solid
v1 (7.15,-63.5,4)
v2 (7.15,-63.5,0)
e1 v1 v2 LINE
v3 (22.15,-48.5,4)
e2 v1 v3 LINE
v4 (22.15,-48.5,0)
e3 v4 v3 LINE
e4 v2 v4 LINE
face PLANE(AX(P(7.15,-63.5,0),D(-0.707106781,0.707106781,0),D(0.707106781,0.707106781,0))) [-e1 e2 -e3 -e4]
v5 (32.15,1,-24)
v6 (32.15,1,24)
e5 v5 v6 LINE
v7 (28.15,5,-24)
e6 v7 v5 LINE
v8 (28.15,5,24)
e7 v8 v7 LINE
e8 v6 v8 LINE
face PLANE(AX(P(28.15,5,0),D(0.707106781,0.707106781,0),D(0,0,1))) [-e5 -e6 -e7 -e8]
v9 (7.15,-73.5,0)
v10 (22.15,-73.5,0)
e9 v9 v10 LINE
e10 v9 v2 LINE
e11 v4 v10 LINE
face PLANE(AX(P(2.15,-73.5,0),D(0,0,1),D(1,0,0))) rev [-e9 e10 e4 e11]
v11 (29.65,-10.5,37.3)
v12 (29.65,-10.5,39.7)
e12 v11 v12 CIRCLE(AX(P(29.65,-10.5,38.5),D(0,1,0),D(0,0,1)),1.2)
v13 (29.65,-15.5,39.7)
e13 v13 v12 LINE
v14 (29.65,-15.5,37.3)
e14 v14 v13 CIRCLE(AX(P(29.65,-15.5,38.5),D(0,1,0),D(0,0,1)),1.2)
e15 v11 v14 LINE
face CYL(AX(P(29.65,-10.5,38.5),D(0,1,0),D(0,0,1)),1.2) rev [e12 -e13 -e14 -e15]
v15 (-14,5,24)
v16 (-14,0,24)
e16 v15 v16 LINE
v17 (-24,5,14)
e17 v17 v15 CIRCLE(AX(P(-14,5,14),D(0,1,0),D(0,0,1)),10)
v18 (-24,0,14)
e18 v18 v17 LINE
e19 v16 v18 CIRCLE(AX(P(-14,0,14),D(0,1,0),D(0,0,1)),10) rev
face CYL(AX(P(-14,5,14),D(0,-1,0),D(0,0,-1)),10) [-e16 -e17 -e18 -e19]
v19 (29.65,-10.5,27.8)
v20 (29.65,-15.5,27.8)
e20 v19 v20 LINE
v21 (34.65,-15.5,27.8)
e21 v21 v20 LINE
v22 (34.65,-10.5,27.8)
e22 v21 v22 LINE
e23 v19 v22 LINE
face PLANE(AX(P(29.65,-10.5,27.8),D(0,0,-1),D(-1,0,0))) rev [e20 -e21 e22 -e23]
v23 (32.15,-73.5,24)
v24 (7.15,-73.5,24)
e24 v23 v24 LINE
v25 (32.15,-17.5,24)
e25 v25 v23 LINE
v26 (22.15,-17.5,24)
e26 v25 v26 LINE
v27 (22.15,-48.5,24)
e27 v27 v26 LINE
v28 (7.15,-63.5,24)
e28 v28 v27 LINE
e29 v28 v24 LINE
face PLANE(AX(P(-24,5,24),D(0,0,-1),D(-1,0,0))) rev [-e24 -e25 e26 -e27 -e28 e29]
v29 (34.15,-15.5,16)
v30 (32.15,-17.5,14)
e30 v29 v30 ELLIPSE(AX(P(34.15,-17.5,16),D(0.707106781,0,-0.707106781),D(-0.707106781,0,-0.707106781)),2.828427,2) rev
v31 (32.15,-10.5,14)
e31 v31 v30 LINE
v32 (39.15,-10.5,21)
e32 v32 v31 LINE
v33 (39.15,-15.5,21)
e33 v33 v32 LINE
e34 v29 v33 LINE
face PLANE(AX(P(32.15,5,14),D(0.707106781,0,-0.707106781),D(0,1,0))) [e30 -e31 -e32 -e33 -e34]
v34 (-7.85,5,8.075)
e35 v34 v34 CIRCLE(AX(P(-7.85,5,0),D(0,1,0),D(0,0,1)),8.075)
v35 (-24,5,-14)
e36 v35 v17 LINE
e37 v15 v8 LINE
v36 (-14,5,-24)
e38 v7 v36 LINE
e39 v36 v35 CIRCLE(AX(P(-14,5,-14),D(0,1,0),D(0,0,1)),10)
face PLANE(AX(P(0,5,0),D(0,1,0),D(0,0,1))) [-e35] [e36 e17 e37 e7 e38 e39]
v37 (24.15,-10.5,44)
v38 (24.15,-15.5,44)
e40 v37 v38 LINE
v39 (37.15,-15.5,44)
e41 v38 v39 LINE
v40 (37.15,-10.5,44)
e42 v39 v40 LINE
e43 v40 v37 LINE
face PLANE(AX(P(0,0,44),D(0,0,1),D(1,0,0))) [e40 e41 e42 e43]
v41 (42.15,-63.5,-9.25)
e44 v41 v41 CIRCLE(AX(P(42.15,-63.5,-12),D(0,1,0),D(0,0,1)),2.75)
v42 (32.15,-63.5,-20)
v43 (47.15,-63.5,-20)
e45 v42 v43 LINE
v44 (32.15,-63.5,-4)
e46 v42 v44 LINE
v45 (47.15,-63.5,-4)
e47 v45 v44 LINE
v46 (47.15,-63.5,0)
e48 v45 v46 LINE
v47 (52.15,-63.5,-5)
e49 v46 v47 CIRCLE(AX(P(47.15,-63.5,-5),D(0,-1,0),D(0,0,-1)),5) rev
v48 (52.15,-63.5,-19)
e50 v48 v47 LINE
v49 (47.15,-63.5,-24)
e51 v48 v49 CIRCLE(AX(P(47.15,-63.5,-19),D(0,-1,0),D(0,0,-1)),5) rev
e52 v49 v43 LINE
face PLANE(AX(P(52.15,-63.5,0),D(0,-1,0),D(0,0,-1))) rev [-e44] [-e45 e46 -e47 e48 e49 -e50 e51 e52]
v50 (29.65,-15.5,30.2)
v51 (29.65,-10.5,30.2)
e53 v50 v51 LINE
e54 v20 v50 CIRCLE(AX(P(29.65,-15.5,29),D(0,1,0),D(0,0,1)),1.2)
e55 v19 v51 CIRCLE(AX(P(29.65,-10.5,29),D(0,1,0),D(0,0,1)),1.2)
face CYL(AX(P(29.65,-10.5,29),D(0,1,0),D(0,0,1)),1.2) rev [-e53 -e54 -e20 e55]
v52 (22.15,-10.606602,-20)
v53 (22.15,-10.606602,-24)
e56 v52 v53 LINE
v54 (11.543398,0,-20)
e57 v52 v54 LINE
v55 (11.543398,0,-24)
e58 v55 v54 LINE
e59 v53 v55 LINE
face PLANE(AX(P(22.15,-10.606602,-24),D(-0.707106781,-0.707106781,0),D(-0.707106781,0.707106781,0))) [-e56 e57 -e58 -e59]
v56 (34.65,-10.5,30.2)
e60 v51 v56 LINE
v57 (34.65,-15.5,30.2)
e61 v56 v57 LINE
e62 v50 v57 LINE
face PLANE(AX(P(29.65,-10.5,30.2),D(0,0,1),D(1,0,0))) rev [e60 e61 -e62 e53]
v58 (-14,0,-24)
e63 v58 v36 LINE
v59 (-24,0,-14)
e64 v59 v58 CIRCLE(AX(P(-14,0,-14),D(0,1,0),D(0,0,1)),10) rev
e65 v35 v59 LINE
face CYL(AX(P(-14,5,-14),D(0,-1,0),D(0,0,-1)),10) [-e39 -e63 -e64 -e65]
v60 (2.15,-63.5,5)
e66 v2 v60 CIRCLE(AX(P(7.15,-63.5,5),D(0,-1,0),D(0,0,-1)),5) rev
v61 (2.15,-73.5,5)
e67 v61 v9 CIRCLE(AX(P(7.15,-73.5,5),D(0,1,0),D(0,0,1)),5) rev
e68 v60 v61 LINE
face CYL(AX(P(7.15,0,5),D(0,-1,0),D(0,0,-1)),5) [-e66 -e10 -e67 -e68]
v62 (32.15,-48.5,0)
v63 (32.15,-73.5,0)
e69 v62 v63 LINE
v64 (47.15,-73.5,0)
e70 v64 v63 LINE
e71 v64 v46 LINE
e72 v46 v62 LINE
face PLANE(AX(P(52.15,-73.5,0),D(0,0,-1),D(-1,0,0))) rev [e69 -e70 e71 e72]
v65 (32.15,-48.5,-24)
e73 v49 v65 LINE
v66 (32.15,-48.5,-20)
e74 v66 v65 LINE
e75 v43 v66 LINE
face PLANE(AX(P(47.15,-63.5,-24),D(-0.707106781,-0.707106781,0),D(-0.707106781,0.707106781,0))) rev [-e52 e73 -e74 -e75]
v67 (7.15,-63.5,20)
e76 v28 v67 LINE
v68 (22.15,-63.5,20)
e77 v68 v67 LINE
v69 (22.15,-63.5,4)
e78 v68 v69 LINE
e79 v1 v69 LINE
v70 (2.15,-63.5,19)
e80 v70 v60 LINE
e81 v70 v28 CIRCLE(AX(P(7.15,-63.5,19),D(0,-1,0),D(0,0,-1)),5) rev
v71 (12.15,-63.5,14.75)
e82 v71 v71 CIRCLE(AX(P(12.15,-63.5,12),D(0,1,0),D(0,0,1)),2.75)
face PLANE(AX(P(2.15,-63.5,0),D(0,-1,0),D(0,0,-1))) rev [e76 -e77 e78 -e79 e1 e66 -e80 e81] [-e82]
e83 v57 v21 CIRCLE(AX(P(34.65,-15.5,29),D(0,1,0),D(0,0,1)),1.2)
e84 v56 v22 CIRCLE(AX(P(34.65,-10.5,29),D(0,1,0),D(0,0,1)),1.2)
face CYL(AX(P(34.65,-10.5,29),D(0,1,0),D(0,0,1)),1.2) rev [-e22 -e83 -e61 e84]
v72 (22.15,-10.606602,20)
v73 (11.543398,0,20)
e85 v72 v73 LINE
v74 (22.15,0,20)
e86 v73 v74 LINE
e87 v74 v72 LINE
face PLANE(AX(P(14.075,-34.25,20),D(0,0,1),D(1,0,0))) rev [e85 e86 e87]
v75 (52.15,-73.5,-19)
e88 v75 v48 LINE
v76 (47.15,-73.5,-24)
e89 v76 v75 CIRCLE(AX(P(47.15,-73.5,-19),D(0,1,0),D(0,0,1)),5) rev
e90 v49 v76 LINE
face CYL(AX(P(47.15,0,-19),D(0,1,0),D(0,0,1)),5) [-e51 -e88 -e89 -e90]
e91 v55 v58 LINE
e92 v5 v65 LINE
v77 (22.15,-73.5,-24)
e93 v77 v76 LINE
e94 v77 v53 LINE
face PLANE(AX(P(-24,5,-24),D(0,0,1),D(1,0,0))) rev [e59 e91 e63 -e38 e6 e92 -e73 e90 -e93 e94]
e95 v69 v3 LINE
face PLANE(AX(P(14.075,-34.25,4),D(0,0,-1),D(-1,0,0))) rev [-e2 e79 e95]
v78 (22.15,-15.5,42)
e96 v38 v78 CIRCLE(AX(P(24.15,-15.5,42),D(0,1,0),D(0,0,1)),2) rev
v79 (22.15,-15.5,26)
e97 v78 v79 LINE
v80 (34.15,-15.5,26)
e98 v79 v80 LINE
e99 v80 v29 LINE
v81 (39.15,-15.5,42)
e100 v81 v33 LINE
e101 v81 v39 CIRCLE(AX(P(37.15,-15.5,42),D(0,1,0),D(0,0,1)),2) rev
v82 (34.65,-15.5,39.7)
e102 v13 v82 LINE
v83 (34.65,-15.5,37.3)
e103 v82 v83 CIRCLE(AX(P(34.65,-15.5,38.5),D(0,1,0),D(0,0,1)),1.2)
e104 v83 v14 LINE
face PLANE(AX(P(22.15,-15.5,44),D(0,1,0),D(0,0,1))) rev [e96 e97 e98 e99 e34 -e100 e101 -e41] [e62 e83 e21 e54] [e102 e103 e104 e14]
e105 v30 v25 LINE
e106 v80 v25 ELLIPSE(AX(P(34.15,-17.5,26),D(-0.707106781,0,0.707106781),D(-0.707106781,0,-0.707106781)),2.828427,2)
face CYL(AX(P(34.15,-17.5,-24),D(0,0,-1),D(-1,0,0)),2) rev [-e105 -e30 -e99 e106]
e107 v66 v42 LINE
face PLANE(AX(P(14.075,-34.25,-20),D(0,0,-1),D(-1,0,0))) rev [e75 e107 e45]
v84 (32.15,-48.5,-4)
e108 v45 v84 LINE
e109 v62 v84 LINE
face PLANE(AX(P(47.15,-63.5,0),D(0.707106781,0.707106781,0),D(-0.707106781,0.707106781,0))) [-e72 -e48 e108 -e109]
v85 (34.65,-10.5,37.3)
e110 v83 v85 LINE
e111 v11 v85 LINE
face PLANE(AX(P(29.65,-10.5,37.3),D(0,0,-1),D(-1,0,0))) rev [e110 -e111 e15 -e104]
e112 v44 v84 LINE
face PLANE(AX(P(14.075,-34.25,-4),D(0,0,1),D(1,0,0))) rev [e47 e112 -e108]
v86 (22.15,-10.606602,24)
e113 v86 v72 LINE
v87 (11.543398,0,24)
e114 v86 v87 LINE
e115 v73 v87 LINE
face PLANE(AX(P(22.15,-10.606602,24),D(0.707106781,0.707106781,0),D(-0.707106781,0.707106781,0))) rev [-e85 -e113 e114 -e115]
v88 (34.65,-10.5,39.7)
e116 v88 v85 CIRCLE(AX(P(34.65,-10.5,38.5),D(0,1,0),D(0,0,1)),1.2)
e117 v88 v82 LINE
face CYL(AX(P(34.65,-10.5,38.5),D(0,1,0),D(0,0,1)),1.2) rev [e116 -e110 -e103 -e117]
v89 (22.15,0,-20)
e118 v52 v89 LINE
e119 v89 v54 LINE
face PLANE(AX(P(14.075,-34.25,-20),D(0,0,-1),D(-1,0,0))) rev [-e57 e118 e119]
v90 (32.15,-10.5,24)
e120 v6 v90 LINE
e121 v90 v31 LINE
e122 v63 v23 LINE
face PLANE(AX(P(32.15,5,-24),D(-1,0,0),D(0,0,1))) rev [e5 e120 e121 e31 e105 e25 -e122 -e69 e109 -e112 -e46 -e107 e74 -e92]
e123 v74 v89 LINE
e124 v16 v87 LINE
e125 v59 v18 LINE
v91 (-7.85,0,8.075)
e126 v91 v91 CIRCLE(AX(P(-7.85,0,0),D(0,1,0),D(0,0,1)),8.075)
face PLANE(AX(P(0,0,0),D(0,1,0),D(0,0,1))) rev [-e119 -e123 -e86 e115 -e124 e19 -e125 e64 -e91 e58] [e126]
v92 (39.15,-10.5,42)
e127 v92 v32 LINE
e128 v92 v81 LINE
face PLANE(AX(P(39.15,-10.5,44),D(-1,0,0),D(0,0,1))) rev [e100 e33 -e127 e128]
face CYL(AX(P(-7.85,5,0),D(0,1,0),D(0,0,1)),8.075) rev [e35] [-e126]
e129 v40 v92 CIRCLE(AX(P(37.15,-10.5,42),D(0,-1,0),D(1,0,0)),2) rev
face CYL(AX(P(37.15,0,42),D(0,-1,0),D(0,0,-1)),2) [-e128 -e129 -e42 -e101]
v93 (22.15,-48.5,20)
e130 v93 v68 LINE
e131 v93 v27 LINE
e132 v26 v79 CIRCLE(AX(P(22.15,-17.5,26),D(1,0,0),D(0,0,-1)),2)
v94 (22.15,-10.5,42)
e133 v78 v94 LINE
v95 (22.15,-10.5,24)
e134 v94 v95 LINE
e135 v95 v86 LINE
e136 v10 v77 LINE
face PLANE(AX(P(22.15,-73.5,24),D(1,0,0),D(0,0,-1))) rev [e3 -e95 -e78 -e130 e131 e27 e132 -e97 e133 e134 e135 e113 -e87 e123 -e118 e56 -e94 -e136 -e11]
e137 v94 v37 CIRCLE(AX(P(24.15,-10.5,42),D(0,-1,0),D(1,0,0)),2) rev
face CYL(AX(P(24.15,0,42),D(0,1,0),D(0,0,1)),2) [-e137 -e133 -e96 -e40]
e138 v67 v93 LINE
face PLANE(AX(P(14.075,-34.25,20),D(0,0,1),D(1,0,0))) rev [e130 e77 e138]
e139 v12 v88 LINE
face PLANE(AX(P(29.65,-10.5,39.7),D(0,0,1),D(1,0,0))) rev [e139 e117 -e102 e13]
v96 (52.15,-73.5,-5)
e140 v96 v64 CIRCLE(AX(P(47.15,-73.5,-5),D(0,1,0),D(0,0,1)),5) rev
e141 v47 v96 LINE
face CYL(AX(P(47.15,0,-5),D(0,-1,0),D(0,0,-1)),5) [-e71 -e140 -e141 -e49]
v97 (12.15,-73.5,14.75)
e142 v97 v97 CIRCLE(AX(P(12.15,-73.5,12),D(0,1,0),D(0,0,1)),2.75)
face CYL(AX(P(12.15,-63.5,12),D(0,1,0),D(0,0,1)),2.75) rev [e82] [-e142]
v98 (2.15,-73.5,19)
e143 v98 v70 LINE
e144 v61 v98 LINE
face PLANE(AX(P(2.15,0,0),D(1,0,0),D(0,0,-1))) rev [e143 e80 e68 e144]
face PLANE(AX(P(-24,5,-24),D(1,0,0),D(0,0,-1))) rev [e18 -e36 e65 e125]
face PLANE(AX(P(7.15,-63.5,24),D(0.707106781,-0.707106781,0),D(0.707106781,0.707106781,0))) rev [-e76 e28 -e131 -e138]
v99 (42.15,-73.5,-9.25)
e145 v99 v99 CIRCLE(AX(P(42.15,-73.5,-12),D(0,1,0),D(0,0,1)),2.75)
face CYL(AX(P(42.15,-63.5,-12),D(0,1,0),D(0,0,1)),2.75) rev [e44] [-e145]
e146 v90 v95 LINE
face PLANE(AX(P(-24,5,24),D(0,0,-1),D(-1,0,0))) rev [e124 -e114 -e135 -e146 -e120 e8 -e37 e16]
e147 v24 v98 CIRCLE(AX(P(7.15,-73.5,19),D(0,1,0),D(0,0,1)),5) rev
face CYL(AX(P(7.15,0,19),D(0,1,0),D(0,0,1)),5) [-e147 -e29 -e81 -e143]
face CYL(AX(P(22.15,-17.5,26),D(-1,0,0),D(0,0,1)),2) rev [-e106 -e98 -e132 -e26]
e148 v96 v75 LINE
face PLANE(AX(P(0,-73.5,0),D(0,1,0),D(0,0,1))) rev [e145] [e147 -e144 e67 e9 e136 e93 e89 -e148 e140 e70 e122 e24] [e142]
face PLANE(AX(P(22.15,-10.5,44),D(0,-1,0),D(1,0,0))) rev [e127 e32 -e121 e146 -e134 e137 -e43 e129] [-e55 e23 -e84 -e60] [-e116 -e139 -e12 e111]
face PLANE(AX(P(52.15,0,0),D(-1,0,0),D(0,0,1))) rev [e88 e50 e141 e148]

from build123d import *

# Parameters (mm, degrees)
SKETCH1_W                 = 56.15
SKETCH1_H                 = 48
BOSS_EXTRUDE1_DEPTH       = 5
SKETCH2_W                 = 10
SKETCH2_H                 = 48
BOSS_EXTRUDE2_DEPTH       = 73.5
SKETCH3_W                 = 24
SKETCH3_H                 = 10
BOSS_EXTRUDE3_DEPTH       = 20
SKETCH19_W                = 24
SKETCH19_H                = 10
BOSS_EXTRUDE5_DEPTH       = 20
FILLET1_R                 = 10
F_1_0MM_DOWEL_HOLE1_D     = 5.5
F_1_0MM_DOWEL_HOLE1_DEPTH = 10
FILLET2_R                 = 5
M6_CLEARANCE_HOLE1_D      = 16.15
CHAMFER2_SIZE             = 4
SKETCH14_W                = 17
SKETCH14_H                = 5
BOSS_EXTRUDE4_DEPTH       = 20
CHAMFER3_SIZE             = 10
FILLET3_R                 = 2
M2_START                  = -15.5
M2_CLEARANCE_SLOT1_DEPTH  = 5
RIB1_REACH                = 114.898
SKETCH20_WALL_W           = 249.008442536
SKETCH20_WALL_H           = 4
RIB2_REACH                = 104.107
SKETCH21_WALL_W           = 227.427527126
SKETCH21_WALL_H           = 4
RIB10_REACH               = 104.107
SKETCH23_WALL_W           = 221.21432369
SKETCH23_WALL_H           = 4


# Read off the part's stored shape, not the designer's step: M2 Clearance Slot1
with BuildPart() as part:
    # Sketch1 → Boss-Extrude1 (new body)
    with BuildSketch(Plane(origin=(0, 0, 0), x_dir=(1, 0, 0), z_dir=(0, 1, 0))):
        with Locations((4.075, 0)):
            Rectangle(SKETCH1_W, SKETCH1_H)
    extrude(amount=BOSS_EXTRUDE1_DEPTH)

    # Sketch2 → Boss-Extrude2 (add)
    with BuildSketch(Plane.XZ):
        with Locations((27.15, 0)):
            Rectangle(SKETCH2_W, SKETCH2_H)
    extrude(amount=BOSS_EXTRUDE2_DEPTH)

    # Sketch3 → Boss-Extrude3 (add)
    with BuildSketch(Plane(origin=(32.15, 0, 0), x_dir=(0, 0, -1), z_dir=(1, 0, 0))):
        with Locations((12, -68.5)):
            Rectangle(SKETCH3_W, SKETCH3_H)
    extrude(amount=BOSS_EXTRUDE3_DEPTH)

    # Sketch19 → Boss-Extrude5 (add)
    with BuildSketch(Plane(origin=(22.15, 0, -25.5), x_dir=(0, 0, 1), z_dir=(-1, 0, 0))):
        with Locations((37.5, -68.5)):
            Rectangle(SKETCH19_W, SKETCH19_H)
    extrude(amount=BOSS_EXTRUDE5_DEPTH)

    # Fillet1
    fillet1_edges = [part.edges().sort_by_distance(p)[0] for p in [
        (-24, 2.5, -24),
        (-24, 2.5, 24),
    ]]
    fillet(fillet1_edges, radius=FILLET1_R)

    # Ø1.0mm Dowel Hole1
    with Locations(Plane(origin=(0, -63.5, 0), x_dir=(1, 0, 0), z_dir=(0, 1, 0))):
        with Locations((42.15, 12), (12.15, -12)):
            Hole(F_1_0MM_DOWEL_HOLE1_D / 2, depth=F_1_0MM_DOWEL_HOLE1_DEPTH)

    # Fillet2
    fillet2_edges = [part.edges().sort_by_distance(p)[0] for p in [
        (52.15, -68.5, 0),
        (52.15, -68.5, -24),
        (2.15, -68.5, 0),
        (2.15, -68.5, 24),
    ]]
    fillet(fillet2_edges, radius=FILLET2_R)

    # M6 Clearance Hole1 (through all)
    with Locations(Plane(origin=(0, 5, 0), x_dir=(1, 0, 0), z_dir=(0, 1, 0))):
        with Locations((-7.85, 0)):
            Hole(M6_CLEARANCE_HOLE1_D / 2)

    # Chamfer2
    chamfer2_edges = [part.edges().sort_by_distance(p)[0] for p in [
        (32.15, 5, 0),
    ]]
    chamfer(chamfer2_edges, length=CHAMFER2_SIZE)

    # Sketch14 → Boss-Extrude4 (add)
    with BuildSketch(Plane.XY.offset(24)):
        with Locations((30.65, -13)):
            Rectangle(SKETCH14_W, SKETCH14_H)
    extrude(amount=BOSS_EXTRUDE4_DEPTH)

    # Chamfer3
    # the kernel refuses this chamfer: 10 mm, written as the material it adds along each edge
    with BuildSketch(Plane(origin=(32.15, -10.5, 24), x_dir=(-0.027495876610586317, 0, -0.9996219169112968), z_dir=(0, -1, 0))) as chamfer3_piece_1_section:
        Polygon((CHAMFER3_SIZE * 0.999621916911, CHAMFER3_SIZE * 0.0274958766106), (-CHAMFER3_SIZE * 0.0274958766106, CHAMFER3_SIZE * 0.999621916911), (0, 0), align=None)
    chamfer3_piece_1 = extrude(amount=5, mode=Mode.PRIVATE)
    chamfer3_piece_1 = split(chamfer3_piece_1, bisect_by=Plane(origin=(39.15, -13, 20.435897436), z_dir=(-1, 0, 0)), keep=Keep.TOP, mode=Mode.PRIVATE)
    add(chamfer3_piece_1)

    # Fillet3
    fillet3_edges = [part.edges().sort_by_distance(p)[0] for p in [
        (27.15, -15.5, 24),
        (22.15, -13, 44),
        (39.15, -13, 44),
        (32.15, -15.5, 19),
    ]]
    fillet(fillet3_edges, radius=FILLET3_R)

    # M2 Clearance Slot1 outline → M2 Clearance Slot1 (cut)
    with BuildSketch(Plane(origin=(0, 0, 0), x_dir=(1, 0, 0), z_dir=(0, 1, 0)).offset(M2_START)):
        with BuildLine():
            Line((34.65, -27.8), (29.65, -27.8))
            ThreePointArc((29.65, -27.8), (28.45, -29), (29.65, -30.2))
            Line((29.65, -30.2), (34.65, -30.2))
            ThreePointArc((34.65, -30.2), (35.85, -29), (34.65, -27.8))
        make_face()
        with BuildLine():
            Line((34.65, -37.3), (29.65, -37.3))
            ThreePointArc((29.65, -37.3), (28.45, -38.5), (29.65, -39.7))
            Line((29.65, -39.7), (34.65, -39.7))
            ThreePointArc((34.65, -39.7), (35.85, -38.5), (34.65, -37.3))
        make_face()
    extrude(amount=M2_CLEARANCE_SLOT1_DEPTH, mode=Mode.SUBTRACT)

    # Sketch20 wall → Rib1 (add, up to next)
    with BuildSketch(Plane(origin=(39.65, -56, -24), x_dir=(-0.707106781187, 0.707106781187, 0), z_dir=(0.707106781187, 0.707106781187, 0)), mode=Mode.PRIVATE) as rib1_sk1:
        with Locations((0, 2)):
            Rectangle(SKETCH20_WALL_W, SKETCH20_WALL_H)
    rib1_tool1 = extrude(rib1_sk1.sketch, amount=-RIB1_REACH, mode=Mode.PRIVATE) - part.part
    rib1 = rib1_tool1.solids().sort_by_distance((39.65, -56, -24))[0]
    add(rib1)

    # Sketch21 wall → Rib2 (add, up to next)
    with BuildSketch(Plane(origin=(14.65, -56, 24), x_dir=(0.707106781187, 0.707106781187, 0), z_dir=(-0.707106781187, 0.707106781187, 0)), mode=Mode.PRIVATE) as rib2_sk1:
        with Locations((0, 2)):
            Rectangle(SKETCH21_WALL_W, SKETCH21_WALL_H)
    rib2_tool1 = extrude(rib2_sk1.sketch, amount=-RIB2_REACH, mode=Mode.PRIVATE) - part.part
    rib2 = rib2_tool1.solids().sort_by_distance((14.65, -56, 24))[0]
    add(rib2)

    # Sketch23 wall → Rib10 (add, up to next)
    with BuildSketch(Plane(origin=(16.846699141, -5.303300859, 24), x_dir=(-0.707106781187, 0.707106781187, 0), z_dir=(-0.707106781187, -0.707106781187, 0)), mode=Mode.PRIVATE) as rib10_sk1:
        with Locations((0, 2)):
            Rectangle(SKETCH23_WALL_W, SKETCH23_WALL_H)
    rib10_tool1 = extrude(rib10_sk1.sketch, amount=-RIB10_REACH, mode=Mode.PRIVATE) - part.part
    rib10 = rib10_tool1.solids().sort_by_distance((16.846699141, -5.303300859, 24))[0]
    add(rib10)

    # Mirror1: Rib2 across plane
    add(rib2.mirror(Plane(origin=(2.15, -63.5, 12), x_dir=(1, 0, 0), z_dir=(0, 0, 1))))

    # Mirror2: Rib1 across plane
    add(rib1.mirror(Plane(origin=(52.15, -63.5, -12), x_dir=(1, 0, 0), z_dir=(0, 0, -1))))

    # Mirror3: Rib10 across plane
    add(rib10.mirror(Plane.XY))


solid = part.part
